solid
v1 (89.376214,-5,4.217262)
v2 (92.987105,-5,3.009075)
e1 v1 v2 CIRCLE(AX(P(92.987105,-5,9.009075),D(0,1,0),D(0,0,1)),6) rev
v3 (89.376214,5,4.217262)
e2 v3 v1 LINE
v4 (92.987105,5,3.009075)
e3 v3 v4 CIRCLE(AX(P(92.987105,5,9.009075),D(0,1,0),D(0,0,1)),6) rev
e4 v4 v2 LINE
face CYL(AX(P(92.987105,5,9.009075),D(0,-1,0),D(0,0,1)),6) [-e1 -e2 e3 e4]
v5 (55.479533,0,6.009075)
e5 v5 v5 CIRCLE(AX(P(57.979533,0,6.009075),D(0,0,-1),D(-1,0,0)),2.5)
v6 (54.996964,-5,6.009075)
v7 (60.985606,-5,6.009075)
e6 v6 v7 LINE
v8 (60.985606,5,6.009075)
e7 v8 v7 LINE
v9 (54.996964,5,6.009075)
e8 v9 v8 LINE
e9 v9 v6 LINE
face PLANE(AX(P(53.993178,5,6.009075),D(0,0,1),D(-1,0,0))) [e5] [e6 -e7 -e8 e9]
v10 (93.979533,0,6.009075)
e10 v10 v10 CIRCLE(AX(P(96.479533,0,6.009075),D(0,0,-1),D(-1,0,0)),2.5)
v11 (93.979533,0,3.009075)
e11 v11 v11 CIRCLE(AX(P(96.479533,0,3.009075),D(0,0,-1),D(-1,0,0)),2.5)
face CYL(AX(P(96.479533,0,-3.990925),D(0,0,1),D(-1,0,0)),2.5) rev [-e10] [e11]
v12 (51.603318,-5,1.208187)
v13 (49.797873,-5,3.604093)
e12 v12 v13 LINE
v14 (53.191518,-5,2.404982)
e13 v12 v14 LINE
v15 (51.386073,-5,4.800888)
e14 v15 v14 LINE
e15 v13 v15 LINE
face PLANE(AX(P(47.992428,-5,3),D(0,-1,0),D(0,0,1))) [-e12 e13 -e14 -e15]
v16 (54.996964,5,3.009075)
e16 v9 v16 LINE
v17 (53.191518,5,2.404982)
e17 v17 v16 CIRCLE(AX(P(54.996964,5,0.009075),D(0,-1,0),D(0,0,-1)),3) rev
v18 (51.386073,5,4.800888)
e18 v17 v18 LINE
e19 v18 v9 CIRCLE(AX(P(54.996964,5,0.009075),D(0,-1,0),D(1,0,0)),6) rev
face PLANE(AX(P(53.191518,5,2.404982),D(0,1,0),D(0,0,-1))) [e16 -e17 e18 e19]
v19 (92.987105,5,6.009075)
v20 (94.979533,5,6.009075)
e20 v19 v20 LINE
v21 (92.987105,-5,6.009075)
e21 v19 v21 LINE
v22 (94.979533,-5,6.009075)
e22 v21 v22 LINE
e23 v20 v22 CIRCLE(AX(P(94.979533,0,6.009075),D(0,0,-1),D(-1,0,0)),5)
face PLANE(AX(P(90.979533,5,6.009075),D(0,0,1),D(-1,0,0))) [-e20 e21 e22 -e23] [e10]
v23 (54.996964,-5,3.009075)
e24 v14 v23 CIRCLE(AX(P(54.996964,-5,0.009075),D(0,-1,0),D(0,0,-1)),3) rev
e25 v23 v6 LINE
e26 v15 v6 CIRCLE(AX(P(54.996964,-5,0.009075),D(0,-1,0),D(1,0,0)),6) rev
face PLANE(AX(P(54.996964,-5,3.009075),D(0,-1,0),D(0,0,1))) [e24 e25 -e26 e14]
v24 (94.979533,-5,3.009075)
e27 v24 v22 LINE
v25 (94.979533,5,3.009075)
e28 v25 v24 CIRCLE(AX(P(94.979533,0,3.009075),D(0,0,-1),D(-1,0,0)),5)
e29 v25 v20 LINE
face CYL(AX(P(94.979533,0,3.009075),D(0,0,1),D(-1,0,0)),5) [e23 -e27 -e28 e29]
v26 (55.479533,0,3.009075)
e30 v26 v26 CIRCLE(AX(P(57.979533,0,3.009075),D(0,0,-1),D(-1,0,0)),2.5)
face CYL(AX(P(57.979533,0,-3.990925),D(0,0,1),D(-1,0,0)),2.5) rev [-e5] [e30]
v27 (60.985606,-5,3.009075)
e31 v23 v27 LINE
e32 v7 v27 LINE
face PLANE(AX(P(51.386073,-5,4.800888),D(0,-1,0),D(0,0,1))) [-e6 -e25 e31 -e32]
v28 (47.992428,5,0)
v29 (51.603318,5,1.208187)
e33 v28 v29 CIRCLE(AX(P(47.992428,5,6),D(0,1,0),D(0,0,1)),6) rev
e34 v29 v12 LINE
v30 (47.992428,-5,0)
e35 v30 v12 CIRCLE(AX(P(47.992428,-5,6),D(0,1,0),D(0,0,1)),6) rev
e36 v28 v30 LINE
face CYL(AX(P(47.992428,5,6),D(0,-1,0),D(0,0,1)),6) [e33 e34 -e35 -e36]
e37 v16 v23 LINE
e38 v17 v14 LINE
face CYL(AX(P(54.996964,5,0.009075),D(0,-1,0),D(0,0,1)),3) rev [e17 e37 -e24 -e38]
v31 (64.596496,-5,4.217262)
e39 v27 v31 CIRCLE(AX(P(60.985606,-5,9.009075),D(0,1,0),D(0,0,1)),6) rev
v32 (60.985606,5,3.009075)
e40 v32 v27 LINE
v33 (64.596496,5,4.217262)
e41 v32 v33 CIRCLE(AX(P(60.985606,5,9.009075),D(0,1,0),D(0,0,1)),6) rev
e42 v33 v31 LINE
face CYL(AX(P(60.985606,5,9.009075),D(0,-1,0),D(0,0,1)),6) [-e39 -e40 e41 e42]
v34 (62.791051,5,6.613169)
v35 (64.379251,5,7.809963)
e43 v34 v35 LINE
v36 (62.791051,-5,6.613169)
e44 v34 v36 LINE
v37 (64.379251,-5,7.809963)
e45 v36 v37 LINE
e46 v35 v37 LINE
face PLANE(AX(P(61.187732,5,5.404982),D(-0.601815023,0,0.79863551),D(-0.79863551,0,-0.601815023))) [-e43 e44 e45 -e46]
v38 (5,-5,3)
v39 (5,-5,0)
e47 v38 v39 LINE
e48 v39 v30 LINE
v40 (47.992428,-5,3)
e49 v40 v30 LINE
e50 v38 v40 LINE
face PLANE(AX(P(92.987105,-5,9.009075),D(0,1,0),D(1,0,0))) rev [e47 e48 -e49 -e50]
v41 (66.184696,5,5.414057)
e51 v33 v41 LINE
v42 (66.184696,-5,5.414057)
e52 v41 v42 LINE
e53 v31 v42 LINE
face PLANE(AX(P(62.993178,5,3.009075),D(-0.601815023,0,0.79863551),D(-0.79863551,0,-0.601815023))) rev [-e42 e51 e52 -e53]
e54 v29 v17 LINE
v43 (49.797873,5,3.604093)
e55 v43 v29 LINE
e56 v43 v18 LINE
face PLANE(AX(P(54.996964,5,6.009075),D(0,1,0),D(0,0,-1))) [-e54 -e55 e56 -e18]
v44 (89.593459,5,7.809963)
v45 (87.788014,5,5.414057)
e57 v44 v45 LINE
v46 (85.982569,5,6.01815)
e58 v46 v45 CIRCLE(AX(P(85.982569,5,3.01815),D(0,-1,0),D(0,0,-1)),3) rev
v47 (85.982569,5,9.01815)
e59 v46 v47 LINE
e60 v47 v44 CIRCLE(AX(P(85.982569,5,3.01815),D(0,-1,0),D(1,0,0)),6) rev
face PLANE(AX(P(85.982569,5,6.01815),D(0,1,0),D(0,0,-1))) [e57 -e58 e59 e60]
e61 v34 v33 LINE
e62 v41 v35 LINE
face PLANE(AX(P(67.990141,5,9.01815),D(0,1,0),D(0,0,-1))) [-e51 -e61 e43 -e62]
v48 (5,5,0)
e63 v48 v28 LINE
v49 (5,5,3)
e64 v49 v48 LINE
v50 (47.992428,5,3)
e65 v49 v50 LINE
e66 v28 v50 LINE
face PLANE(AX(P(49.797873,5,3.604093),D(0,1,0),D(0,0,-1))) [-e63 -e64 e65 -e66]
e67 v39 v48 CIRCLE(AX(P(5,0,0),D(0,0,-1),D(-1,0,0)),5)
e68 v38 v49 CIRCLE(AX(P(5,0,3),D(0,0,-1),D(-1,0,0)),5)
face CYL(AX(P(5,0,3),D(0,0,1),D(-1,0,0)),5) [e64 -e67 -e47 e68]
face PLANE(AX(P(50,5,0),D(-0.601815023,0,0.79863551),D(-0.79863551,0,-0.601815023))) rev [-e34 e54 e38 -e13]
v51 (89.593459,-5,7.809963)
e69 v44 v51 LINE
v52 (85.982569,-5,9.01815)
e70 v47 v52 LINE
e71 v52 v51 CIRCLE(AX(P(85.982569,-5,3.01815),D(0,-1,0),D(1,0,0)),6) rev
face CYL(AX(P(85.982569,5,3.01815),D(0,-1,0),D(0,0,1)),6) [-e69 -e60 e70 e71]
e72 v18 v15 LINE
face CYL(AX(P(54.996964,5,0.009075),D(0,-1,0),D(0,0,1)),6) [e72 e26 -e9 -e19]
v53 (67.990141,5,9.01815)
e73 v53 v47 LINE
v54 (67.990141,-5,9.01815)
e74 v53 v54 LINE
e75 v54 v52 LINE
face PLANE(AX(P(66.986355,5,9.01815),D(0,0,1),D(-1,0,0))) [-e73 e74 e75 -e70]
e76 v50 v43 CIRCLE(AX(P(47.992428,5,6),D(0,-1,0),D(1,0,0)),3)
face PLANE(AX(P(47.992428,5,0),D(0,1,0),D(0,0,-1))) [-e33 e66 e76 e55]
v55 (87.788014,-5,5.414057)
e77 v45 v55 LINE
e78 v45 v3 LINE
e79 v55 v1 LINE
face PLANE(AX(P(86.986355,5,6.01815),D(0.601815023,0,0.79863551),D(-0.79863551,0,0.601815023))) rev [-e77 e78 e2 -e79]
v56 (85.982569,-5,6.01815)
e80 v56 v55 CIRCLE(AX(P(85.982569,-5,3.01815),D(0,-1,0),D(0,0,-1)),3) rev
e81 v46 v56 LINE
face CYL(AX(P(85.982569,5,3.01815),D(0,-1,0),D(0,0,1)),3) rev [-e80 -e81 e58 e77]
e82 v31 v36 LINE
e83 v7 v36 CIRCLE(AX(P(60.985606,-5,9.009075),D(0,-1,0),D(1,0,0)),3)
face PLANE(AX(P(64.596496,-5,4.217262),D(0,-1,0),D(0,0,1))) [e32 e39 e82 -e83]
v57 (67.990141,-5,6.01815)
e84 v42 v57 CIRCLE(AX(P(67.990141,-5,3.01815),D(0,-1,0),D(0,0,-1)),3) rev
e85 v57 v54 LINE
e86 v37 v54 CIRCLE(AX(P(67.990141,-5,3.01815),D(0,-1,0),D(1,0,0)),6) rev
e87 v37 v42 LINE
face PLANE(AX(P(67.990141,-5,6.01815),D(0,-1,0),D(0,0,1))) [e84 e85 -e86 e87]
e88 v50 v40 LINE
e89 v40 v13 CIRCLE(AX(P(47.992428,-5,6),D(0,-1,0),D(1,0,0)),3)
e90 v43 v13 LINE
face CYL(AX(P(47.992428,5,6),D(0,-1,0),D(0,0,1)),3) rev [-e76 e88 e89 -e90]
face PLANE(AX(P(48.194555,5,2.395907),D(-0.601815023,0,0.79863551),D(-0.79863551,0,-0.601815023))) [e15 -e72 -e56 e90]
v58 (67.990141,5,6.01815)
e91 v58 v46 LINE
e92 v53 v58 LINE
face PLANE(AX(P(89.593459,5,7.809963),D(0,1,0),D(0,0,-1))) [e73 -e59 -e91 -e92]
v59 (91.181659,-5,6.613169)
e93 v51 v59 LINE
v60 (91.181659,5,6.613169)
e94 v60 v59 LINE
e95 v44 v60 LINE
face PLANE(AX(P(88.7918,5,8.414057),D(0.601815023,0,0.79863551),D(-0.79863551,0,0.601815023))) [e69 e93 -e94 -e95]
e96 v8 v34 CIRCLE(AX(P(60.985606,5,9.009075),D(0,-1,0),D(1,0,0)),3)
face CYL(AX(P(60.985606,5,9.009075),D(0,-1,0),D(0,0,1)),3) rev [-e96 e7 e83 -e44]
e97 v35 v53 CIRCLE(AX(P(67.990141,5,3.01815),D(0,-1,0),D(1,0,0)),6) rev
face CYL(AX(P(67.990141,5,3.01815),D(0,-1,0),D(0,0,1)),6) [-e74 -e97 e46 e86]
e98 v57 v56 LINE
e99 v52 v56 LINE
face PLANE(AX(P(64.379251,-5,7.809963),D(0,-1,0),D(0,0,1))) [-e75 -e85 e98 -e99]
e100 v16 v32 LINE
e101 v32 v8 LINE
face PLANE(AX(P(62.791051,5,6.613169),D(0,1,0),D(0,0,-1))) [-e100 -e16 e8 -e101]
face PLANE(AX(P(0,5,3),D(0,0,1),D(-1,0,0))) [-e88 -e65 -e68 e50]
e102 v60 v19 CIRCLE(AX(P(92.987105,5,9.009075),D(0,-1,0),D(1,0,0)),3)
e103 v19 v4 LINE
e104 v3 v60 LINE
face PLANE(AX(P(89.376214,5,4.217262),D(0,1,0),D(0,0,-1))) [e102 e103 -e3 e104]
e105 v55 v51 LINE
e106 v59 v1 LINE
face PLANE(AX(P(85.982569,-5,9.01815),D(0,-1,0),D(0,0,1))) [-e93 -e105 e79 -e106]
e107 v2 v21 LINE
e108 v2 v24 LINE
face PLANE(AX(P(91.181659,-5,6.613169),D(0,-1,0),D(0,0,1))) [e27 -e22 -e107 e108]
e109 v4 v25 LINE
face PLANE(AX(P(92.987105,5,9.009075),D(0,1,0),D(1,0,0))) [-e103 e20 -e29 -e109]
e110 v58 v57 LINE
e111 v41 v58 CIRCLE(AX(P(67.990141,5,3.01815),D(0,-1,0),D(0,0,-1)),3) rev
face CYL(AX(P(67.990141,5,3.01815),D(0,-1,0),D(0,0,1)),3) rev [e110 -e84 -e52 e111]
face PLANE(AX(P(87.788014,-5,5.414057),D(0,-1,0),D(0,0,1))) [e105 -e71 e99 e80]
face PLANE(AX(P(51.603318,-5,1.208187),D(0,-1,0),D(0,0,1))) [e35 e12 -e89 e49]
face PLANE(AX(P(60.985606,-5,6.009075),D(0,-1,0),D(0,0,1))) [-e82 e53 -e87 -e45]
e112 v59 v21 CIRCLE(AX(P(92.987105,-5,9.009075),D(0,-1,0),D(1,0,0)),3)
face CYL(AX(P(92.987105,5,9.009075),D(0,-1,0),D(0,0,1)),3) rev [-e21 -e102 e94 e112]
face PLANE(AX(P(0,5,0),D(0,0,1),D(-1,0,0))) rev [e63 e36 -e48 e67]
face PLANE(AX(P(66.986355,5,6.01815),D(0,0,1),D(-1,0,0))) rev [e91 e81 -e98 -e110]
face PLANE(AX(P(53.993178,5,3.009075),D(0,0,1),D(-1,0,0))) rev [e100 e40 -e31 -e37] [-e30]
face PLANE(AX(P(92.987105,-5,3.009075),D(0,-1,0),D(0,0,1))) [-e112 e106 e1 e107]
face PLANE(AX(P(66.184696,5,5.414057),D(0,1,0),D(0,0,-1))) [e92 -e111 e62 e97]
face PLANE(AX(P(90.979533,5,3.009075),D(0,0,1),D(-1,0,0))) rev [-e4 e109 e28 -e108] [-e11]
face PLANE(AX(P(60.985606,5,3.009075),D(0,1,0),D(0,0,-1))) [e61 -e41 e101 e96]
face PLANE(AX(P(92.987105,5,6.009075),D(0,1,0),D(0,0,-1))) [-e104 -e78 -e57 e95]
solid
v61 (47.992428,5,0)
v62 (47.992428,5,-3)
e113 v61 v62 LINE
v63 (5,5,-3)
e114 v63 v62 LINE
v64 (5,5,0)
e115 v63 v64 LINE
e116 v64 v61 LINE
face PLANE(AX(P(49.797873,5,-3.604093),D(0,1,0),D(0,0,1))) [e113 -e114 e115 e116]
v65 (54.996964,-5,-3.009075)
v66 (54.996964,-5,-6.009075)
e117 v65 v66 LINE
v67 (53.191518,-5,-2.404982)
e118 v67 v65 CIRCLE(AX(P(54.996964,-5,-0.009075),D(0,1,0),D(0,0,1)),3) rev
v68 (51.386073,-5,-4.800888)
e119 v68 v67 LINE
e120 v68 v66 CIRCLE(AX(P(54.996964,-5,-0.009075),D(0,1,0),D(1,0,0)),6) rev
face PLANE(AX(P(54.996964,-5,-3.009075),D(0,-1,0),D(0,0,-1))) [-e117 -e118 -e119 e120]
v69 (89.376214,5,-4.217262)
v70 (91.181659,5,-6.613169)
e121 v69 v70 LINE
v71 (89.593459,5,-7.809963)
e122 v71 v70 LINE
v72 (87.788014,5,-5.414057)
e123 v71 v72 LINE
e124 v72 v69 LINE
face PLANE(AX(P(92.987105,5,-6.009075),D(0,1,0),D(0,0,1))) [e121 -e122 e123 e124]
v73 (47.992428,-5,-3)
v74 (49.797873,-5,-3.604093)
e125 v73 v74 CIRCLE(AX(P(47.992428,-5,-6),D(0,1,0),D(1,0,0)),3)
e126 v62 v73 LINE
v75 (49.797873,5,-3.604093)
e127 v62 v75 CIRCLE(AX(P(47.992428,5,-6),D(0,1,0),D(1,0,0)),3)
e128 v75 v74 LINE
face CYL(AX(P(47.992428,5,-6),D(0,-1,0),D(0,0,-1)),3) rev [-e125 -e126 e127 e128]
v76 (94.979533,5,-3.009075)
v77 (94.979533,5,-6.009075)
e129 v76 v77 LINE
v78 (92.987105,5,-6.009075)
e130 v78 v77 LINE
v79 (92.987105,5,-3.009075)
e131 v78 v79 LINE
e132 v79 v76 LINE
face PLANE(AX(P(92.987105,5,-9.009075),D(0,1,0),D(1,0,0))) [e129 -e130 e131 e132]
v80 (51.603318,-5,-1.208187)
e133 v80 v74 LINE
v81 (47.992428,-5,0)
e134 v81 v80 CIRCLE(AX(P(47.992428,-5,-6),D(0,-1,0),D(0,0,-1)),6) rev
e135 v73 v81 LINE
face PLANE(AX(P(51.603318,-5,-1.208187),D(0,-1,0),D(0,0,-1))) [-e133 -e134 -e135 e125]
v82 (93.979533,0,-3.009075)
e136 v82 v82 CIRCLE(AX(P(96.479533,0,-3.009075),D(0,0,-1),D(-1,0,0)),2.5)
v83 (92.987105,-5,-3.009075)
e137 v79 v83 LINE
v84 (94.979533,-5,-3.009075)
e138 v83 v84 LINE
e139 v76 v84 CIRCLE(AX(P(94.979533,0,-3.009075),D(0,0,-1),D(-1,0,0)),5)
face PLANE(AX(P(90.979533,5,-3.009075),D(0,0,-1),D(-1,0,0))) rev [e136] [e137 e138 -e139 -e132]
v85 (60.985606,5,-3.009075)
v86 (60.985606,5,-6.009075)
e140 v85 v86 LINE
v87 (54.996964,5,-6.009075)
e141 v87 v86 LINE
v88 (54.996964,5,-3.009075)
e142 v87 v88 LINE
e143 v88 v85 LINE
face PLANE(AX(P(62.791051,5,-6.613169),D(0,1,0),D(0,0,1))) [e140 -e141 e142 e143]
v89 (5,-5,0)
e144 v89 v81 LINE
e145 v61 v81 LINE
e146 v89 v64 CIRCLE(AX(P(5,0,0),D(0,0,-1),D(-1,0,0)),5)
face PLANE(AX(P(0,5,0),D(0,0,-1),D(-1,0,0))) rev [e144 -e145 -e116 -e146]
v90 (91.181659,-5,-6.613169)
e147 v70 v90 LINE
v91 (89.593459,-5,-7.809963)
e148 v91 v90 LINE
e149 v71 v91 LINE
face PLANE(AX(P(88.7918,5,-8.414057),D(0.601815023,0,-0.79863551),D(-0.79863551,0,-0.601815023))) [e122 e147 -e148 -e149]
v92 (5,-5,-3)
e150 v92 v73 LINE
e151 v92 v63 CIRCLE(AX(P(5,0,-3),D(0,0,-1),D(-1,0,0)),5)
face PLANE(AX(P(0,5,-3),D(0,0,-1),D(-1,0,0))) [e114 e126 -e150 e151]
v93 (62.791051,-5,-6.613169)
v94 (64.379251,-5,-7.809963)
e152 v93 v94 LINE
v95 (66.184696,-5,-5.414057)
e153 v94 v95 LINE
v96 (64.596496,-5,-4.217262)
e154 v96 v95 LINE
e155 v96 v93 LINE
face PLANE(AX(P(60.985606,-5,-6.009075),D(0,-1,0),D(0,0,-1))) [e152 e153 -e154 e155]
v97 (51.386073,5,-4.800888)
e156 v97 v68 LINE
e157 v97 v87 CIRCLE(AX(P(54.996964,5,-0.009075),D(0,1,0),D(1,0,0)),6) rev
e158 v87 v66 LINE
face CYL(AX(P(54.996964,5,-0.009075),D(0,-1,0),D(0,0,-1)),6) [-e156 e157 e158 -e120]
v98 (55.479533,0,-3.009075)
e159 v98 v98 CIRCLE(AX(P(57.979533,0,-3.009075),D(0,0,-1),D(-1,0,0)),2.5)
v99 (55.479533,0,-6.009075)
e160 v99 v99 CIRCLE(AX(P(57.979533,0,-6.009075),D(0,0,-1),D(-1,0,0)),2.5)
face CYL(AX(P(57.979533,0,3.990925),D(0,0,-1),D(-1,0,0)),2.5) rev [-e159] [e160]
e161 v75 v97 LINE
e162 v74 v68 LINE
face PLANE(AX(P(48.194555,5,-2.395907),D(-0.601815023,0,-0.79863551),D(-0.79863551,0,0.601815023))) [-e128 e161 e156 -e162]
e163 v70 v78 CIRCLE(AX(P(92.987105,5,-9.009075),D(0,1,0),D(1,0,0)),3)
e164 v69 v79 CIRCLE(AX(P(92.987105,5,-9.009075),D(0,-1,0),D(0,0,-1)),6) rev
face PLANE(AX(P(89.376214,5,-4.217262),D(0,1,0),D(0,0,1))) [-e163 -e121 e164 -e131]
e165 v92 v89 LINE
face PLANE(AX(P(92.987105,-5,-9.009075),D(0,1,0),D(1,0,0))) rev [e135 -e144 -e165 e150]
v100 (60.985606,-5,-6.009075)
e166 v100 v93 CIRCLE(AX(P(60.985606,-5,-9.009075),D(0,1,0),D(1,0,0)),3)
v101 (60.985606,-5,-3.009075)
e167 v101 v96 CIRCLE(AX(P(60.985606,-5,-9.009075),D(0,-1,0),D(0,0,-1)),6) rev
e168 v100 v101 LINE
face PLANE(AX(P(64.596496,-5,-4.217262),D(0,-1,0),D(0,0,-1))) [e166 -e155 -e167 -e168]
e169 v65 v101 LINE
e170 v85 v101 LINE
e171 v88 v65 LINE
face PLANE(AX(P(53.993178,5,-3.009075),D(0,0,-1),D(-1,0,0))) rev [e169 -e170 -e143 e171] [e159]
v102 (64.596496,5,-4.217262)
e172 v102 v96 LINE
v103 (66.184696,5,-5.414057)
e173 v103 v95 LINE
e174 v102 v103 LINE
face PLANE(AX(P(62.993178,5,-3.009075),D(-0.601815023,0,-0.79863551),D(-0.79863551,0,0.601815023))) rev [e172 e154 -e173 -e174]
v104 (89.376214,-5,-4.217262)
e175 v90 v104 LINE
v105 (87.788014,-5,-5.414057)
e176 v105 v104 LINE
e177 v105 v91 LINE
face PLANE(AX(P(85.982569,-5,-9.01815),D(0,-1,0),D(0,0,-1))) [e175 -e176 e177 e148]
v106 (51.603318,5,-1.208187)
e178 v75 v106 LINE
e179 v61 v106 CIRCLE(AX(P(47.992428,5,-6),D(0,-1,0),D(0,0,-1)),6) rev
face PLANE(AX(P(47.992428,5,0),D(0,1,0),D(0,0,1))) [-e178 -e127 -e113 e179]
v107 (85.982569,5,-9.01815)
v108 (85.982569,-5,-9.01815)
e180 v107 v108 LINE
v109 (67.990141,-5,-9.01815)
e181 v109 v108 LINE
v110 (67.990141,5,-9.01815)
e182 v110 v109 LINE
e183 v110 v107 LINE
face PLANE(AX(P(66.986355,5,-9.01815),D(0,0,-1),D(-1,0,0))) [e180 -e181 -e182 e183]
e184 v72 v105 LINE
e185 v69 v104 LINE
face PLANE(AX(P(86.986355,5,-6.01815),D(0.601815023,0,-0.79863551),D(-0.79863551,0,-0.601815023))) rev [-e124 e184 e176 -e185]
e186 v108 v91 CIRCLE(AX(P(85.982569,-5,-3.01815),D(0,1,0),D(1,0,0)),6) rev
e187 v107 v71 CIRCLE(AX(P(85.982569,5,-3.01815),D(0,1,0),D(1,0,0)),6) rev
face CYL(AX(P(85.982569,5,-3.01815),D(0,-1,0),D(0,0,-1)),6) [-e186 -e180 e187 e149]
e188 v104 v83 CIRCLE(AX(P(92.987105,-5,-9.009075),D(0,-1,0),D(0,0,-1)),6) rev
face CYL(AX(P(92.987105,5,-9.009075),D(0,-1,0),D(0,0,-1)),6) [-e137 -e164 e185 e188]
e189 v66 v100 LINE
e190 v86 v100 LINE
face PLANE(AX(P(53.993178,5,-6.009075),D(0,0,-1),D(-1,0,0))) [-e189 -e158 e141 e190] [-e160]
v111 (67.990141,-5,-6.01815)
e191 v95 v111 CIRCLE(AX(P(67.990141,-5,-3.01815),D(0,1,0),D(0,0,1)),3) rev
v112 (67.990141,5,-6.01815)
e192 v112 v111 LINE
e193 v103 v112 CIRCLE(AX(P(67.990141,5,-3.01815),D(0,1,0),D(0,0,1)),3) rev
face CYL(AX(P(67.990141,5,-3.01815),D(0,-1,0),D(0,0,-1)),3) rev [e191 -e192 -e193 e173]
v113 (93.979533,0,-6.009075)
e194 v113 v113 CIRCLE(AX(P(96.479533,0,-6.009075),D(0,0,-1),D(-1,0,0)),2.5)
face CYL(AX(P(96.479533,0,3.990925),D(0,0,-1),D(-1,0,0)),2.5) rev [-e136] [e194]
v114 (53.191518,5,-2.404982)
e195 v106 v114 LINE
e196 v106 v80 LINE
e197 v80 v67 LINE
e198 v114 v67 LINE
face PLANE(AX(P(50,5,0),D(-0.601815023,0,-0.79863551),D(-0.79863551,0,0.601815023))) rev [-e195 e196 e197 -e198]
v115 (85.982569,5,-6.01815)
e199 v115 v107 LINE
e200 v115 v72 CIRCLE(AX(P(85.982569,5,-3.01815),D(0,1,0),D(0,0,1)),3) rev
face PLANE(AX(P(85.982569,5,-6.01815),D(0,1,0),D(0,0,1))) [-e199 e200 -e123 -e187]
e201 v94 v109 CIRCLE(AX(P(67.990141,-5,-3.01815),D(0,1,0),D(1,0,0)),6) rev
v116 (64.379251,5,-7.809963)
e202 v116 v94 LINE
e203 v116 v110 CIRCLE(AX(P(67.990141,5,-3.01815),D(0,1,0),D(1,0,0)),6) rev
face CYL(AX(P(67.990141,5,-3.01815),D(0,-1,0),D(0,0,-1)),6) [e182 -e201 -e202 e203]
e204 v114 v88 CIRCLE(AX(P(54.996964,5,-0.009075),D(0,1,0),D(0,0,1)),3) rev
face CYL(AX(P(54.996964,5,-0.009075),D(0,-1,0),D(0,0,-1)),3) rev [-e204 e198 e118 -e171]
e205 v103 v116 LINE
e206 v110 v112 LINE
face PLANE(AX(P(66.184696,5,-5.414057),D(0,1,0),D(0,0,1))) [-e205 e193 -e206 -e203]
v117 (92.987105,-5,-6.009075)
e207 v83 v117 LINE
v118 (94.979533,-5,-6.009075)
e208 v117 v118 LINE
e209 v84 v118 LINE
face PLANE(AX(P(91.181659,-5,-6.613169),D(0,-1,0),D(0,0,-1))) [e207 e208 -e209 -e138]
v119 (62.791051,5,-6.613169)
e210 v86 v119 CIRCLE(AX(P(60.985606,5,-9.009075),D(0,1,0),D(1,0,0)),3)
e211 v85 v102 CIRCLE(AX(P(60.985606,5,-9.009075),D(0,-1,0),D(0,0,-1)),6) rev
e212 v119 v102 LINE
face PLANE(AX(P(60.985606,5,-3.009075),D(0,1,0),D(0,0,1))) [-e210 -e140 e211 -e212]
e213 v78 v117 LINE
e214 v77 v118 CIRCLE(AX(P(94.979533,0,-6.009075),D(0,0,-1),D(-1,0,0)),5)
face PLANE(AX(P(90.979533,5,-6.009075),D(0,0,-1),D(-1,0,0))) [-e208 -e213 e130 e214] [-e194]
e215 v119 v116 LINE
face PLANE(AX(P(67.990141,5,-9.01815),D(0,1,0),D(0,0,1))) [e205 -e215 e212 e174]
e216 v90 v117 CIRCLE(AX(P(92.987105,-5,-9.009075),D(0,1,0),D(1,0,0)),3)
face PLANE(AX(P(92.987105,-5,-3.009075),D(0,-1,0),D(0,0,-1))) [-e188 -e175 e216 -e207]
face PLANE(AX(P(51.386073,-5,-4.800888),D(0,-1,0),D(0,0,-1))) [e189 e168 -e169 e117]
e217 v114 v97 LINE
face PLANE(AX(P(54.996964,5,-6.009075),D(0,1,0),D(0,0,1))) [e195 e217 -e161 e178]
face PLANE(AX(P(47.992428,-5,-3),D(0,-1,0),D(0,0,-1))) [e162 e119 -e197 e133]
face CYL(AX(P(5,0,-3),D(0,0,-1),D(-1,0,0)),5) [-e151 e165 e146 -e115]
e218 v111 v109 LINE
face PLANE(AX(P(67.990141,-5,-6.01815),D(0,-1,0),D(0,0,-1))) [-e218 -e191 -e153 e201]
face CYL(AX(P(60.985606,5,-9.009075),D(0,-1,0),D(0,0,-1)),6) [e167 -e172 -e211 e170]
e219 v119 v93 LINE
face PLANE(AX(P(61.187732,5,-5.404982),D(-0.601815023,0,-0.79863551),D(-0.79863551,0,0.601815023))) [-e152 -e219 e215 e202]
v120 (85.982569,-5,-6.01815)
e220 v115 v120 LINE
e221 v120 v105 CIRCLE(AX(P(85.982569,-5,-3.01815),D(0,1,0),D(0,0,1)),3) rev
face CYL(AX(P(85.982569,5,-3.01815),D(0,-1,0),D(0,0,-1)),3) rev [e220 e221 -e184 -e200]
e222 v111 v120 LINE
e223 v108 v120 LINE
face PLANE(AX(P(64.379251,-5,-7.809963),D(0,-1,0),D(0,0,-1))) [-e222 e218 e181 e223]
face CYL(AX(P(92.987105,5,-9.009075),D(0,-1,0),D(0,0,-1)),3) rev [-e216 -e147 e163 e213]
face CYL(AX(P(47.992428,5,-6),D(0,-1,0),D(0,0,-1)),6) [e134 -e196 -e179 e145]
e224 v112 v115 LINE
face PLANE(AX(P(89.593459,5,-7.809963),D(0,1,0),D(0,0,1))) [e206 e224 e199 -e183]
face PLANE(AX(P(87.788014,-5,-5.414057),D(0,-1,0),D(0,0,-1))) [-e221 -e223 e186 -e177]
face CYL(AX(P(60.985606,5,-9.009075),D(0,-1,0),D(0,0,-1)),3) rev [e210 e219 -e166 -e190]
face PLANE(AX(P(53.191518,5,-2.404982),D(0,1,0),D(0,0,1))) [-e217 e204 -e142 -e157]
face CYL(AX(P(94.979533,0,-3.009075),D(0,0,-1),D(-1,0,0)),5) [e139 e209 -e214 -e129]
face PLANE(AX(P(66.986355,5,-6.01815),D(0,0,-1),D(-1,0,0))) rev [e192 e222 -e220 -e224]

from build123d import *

# Parameters (mm, degrees)
BASE_FLANGE1_DEPTH = 5
SKETCH6_OUTSIDE_W  = 122.156
SKETCH6_OUTSIDE_H  = 32.176
CUT_EXTRUDE1_DEPTH = 101.509870076
SKETCH7_R          = 2.5
CUT_EXTRUDE2_DEPTH = 10


# Sheet-metal steps are written as plain solids
with BuildPart() as part:
    # Sketch1 → Base-Flange1 (new, symmetric)
    with BuildSketch(Plane(origin=(0, 0, 0), x_dir=(1, 0, 0), z_dir=(0, 1, 0))):
        with BuildLine():
            Line((0, 0), (47.992428083, 0))
            ThreePointArc((47.992428083, 0), (49.896256021, 0.310058069), (51.603318222, 1.20818694))
            Line((51.603318222, 1.20818694), (53.191518439, 2.404981646))
            ThreePointArc((53.191518439, 2.404981646), (54.04504954, 2.854046081), (54.996963509, 3.009075116))
            Line((54.996963509, 3.009075116), (60.985605633, 3.009075116))
            ThreePointArc((60.985605633, 3.009075116), (62.889433572, 3.319133185), (64.596495772, 4.217262055))
            Line((64.596495772, 4.217262055), (66.18469599, 5.414056762))
            ThreePointArc((66.18469599, 5.414056762), (67.03822709, 5.863121197), (67.990141059, 6.018150232))
            Line((67.990141059, 6.018150232), (85.982569142, 6.018150232))
            ThreePointArc((85.982569142, 6.018150232), (86.934483111, 5.863121197), (87.788014211, 5.414056762))
            Line((87.788014211, 5.414056762), (89.376214429, 4.217262055))
            ThreePointArc((89.376214429, 4.217262055), (91.083276629, 3.319133185), (92.987104568, 3.009075116))
            Line((92.987104568, 3.009075116), (99.979532651, 3.009075116))
            Line((99.979532651, 3.009075116), (99.979532651, 6.009075116))
            Line((99.979532651, 6.009075116), (92.987104568, 6.009075116))
            ThreePointArc((92.987104568, 6.009075116), (92.035190599, 6.16410415), (91.181659498, 6.613168586))
            Line((91.181659498, 6.613168586), (89.593459281, 7.809963292))
            ThreePointArc((89.593459281, 7.809963292), (87.88639708, 8.708092163), (85.982569142, 9.018150232))
            Line((85.982569142, 9.018150232), (67.990141059, 9.018150232))
            ThreePointArc((67.990141059, 9.018150232), (66.086313121, 8.708092163), (64.37925092, 7.809963292))
            Line((64.37925092, 7.809963292), (62.791050703, 6.613168586))
            ThreePointArc((62.791050703, 6.613168586), (61.937519602, 6.16410415), (60.985605633, 6.009075116))
            Line((60.985605633, 6.009075116), (54.996963509, 6.009075116))
            ThreePointArc((54.996963509, 6.009075116), (53.09313557, 5.699017047), (51.38607337, 4.800888176))
            Line((51.38607337, 4.800888176), (49.797873152, 3.60409347))
            ThreePointArc((49.797873152, 3.60409347), (48.944342052, 3.155029034), (47.992428083, 3))
            Line((47.992428083, 3), (0, 3))
            Line((0, 3), (0, 0))
        make_face()
    extrude(amount=BASE_FLANGE1_DEPTH, both=True)

    # Sketch6 outside → Cut-Extrude1 (cut, through all)
    with BuildSketch(Plane(origin=(0, 0, -9.018150232), x_dir=(-1, 0, 0), z_dir=(0, 0, -1))):
        with Locations((-49.99, 0)):
            Rectangle(SKETCH6_OUTSIDE_W, SKETCH6_OUTSIDE_H)
        with BuildLine():
            Line((-94.979532651, 5), (-5, 5))
            ThreePointArc((-5, 5), (0, 0), (-5, -5))
            Line((-5, -5), (-94.979532651, -5))
            ThreePointArc((-94.979532651, -5), (-99.979532651, 0), (-94.979532651, 5))
        make_face(mode=Mode.SUBTRACT)
    extrude(amount=-CUT_EXTRUDE1_DEPTH, mode=Mode.SUBTRACT)

    # Sketch7 → Cut-Extrude2 (cut)
    with BuildSketch(Plane(origin=(0, 0, -6.009075116), x_dir=(-1, 0, 0), z_dir=(0, 0, -1))):
        with Locations((-96.479532651, 0)):
            Circle(SKETCH7_R)
        with Locations((-57.979532651, 0)):
            Circle(SKETCH7_R)
    extrude(amount=-CUT_EXTRUDE2_DEPTH, mode=Mode.SUBTRACT)


with BuildPart() as body_2:
    # Mirror1: mirrored copy
    add(part.part.mirror(Plane.XY))


solid = Compound([part.part, body_2.part])
